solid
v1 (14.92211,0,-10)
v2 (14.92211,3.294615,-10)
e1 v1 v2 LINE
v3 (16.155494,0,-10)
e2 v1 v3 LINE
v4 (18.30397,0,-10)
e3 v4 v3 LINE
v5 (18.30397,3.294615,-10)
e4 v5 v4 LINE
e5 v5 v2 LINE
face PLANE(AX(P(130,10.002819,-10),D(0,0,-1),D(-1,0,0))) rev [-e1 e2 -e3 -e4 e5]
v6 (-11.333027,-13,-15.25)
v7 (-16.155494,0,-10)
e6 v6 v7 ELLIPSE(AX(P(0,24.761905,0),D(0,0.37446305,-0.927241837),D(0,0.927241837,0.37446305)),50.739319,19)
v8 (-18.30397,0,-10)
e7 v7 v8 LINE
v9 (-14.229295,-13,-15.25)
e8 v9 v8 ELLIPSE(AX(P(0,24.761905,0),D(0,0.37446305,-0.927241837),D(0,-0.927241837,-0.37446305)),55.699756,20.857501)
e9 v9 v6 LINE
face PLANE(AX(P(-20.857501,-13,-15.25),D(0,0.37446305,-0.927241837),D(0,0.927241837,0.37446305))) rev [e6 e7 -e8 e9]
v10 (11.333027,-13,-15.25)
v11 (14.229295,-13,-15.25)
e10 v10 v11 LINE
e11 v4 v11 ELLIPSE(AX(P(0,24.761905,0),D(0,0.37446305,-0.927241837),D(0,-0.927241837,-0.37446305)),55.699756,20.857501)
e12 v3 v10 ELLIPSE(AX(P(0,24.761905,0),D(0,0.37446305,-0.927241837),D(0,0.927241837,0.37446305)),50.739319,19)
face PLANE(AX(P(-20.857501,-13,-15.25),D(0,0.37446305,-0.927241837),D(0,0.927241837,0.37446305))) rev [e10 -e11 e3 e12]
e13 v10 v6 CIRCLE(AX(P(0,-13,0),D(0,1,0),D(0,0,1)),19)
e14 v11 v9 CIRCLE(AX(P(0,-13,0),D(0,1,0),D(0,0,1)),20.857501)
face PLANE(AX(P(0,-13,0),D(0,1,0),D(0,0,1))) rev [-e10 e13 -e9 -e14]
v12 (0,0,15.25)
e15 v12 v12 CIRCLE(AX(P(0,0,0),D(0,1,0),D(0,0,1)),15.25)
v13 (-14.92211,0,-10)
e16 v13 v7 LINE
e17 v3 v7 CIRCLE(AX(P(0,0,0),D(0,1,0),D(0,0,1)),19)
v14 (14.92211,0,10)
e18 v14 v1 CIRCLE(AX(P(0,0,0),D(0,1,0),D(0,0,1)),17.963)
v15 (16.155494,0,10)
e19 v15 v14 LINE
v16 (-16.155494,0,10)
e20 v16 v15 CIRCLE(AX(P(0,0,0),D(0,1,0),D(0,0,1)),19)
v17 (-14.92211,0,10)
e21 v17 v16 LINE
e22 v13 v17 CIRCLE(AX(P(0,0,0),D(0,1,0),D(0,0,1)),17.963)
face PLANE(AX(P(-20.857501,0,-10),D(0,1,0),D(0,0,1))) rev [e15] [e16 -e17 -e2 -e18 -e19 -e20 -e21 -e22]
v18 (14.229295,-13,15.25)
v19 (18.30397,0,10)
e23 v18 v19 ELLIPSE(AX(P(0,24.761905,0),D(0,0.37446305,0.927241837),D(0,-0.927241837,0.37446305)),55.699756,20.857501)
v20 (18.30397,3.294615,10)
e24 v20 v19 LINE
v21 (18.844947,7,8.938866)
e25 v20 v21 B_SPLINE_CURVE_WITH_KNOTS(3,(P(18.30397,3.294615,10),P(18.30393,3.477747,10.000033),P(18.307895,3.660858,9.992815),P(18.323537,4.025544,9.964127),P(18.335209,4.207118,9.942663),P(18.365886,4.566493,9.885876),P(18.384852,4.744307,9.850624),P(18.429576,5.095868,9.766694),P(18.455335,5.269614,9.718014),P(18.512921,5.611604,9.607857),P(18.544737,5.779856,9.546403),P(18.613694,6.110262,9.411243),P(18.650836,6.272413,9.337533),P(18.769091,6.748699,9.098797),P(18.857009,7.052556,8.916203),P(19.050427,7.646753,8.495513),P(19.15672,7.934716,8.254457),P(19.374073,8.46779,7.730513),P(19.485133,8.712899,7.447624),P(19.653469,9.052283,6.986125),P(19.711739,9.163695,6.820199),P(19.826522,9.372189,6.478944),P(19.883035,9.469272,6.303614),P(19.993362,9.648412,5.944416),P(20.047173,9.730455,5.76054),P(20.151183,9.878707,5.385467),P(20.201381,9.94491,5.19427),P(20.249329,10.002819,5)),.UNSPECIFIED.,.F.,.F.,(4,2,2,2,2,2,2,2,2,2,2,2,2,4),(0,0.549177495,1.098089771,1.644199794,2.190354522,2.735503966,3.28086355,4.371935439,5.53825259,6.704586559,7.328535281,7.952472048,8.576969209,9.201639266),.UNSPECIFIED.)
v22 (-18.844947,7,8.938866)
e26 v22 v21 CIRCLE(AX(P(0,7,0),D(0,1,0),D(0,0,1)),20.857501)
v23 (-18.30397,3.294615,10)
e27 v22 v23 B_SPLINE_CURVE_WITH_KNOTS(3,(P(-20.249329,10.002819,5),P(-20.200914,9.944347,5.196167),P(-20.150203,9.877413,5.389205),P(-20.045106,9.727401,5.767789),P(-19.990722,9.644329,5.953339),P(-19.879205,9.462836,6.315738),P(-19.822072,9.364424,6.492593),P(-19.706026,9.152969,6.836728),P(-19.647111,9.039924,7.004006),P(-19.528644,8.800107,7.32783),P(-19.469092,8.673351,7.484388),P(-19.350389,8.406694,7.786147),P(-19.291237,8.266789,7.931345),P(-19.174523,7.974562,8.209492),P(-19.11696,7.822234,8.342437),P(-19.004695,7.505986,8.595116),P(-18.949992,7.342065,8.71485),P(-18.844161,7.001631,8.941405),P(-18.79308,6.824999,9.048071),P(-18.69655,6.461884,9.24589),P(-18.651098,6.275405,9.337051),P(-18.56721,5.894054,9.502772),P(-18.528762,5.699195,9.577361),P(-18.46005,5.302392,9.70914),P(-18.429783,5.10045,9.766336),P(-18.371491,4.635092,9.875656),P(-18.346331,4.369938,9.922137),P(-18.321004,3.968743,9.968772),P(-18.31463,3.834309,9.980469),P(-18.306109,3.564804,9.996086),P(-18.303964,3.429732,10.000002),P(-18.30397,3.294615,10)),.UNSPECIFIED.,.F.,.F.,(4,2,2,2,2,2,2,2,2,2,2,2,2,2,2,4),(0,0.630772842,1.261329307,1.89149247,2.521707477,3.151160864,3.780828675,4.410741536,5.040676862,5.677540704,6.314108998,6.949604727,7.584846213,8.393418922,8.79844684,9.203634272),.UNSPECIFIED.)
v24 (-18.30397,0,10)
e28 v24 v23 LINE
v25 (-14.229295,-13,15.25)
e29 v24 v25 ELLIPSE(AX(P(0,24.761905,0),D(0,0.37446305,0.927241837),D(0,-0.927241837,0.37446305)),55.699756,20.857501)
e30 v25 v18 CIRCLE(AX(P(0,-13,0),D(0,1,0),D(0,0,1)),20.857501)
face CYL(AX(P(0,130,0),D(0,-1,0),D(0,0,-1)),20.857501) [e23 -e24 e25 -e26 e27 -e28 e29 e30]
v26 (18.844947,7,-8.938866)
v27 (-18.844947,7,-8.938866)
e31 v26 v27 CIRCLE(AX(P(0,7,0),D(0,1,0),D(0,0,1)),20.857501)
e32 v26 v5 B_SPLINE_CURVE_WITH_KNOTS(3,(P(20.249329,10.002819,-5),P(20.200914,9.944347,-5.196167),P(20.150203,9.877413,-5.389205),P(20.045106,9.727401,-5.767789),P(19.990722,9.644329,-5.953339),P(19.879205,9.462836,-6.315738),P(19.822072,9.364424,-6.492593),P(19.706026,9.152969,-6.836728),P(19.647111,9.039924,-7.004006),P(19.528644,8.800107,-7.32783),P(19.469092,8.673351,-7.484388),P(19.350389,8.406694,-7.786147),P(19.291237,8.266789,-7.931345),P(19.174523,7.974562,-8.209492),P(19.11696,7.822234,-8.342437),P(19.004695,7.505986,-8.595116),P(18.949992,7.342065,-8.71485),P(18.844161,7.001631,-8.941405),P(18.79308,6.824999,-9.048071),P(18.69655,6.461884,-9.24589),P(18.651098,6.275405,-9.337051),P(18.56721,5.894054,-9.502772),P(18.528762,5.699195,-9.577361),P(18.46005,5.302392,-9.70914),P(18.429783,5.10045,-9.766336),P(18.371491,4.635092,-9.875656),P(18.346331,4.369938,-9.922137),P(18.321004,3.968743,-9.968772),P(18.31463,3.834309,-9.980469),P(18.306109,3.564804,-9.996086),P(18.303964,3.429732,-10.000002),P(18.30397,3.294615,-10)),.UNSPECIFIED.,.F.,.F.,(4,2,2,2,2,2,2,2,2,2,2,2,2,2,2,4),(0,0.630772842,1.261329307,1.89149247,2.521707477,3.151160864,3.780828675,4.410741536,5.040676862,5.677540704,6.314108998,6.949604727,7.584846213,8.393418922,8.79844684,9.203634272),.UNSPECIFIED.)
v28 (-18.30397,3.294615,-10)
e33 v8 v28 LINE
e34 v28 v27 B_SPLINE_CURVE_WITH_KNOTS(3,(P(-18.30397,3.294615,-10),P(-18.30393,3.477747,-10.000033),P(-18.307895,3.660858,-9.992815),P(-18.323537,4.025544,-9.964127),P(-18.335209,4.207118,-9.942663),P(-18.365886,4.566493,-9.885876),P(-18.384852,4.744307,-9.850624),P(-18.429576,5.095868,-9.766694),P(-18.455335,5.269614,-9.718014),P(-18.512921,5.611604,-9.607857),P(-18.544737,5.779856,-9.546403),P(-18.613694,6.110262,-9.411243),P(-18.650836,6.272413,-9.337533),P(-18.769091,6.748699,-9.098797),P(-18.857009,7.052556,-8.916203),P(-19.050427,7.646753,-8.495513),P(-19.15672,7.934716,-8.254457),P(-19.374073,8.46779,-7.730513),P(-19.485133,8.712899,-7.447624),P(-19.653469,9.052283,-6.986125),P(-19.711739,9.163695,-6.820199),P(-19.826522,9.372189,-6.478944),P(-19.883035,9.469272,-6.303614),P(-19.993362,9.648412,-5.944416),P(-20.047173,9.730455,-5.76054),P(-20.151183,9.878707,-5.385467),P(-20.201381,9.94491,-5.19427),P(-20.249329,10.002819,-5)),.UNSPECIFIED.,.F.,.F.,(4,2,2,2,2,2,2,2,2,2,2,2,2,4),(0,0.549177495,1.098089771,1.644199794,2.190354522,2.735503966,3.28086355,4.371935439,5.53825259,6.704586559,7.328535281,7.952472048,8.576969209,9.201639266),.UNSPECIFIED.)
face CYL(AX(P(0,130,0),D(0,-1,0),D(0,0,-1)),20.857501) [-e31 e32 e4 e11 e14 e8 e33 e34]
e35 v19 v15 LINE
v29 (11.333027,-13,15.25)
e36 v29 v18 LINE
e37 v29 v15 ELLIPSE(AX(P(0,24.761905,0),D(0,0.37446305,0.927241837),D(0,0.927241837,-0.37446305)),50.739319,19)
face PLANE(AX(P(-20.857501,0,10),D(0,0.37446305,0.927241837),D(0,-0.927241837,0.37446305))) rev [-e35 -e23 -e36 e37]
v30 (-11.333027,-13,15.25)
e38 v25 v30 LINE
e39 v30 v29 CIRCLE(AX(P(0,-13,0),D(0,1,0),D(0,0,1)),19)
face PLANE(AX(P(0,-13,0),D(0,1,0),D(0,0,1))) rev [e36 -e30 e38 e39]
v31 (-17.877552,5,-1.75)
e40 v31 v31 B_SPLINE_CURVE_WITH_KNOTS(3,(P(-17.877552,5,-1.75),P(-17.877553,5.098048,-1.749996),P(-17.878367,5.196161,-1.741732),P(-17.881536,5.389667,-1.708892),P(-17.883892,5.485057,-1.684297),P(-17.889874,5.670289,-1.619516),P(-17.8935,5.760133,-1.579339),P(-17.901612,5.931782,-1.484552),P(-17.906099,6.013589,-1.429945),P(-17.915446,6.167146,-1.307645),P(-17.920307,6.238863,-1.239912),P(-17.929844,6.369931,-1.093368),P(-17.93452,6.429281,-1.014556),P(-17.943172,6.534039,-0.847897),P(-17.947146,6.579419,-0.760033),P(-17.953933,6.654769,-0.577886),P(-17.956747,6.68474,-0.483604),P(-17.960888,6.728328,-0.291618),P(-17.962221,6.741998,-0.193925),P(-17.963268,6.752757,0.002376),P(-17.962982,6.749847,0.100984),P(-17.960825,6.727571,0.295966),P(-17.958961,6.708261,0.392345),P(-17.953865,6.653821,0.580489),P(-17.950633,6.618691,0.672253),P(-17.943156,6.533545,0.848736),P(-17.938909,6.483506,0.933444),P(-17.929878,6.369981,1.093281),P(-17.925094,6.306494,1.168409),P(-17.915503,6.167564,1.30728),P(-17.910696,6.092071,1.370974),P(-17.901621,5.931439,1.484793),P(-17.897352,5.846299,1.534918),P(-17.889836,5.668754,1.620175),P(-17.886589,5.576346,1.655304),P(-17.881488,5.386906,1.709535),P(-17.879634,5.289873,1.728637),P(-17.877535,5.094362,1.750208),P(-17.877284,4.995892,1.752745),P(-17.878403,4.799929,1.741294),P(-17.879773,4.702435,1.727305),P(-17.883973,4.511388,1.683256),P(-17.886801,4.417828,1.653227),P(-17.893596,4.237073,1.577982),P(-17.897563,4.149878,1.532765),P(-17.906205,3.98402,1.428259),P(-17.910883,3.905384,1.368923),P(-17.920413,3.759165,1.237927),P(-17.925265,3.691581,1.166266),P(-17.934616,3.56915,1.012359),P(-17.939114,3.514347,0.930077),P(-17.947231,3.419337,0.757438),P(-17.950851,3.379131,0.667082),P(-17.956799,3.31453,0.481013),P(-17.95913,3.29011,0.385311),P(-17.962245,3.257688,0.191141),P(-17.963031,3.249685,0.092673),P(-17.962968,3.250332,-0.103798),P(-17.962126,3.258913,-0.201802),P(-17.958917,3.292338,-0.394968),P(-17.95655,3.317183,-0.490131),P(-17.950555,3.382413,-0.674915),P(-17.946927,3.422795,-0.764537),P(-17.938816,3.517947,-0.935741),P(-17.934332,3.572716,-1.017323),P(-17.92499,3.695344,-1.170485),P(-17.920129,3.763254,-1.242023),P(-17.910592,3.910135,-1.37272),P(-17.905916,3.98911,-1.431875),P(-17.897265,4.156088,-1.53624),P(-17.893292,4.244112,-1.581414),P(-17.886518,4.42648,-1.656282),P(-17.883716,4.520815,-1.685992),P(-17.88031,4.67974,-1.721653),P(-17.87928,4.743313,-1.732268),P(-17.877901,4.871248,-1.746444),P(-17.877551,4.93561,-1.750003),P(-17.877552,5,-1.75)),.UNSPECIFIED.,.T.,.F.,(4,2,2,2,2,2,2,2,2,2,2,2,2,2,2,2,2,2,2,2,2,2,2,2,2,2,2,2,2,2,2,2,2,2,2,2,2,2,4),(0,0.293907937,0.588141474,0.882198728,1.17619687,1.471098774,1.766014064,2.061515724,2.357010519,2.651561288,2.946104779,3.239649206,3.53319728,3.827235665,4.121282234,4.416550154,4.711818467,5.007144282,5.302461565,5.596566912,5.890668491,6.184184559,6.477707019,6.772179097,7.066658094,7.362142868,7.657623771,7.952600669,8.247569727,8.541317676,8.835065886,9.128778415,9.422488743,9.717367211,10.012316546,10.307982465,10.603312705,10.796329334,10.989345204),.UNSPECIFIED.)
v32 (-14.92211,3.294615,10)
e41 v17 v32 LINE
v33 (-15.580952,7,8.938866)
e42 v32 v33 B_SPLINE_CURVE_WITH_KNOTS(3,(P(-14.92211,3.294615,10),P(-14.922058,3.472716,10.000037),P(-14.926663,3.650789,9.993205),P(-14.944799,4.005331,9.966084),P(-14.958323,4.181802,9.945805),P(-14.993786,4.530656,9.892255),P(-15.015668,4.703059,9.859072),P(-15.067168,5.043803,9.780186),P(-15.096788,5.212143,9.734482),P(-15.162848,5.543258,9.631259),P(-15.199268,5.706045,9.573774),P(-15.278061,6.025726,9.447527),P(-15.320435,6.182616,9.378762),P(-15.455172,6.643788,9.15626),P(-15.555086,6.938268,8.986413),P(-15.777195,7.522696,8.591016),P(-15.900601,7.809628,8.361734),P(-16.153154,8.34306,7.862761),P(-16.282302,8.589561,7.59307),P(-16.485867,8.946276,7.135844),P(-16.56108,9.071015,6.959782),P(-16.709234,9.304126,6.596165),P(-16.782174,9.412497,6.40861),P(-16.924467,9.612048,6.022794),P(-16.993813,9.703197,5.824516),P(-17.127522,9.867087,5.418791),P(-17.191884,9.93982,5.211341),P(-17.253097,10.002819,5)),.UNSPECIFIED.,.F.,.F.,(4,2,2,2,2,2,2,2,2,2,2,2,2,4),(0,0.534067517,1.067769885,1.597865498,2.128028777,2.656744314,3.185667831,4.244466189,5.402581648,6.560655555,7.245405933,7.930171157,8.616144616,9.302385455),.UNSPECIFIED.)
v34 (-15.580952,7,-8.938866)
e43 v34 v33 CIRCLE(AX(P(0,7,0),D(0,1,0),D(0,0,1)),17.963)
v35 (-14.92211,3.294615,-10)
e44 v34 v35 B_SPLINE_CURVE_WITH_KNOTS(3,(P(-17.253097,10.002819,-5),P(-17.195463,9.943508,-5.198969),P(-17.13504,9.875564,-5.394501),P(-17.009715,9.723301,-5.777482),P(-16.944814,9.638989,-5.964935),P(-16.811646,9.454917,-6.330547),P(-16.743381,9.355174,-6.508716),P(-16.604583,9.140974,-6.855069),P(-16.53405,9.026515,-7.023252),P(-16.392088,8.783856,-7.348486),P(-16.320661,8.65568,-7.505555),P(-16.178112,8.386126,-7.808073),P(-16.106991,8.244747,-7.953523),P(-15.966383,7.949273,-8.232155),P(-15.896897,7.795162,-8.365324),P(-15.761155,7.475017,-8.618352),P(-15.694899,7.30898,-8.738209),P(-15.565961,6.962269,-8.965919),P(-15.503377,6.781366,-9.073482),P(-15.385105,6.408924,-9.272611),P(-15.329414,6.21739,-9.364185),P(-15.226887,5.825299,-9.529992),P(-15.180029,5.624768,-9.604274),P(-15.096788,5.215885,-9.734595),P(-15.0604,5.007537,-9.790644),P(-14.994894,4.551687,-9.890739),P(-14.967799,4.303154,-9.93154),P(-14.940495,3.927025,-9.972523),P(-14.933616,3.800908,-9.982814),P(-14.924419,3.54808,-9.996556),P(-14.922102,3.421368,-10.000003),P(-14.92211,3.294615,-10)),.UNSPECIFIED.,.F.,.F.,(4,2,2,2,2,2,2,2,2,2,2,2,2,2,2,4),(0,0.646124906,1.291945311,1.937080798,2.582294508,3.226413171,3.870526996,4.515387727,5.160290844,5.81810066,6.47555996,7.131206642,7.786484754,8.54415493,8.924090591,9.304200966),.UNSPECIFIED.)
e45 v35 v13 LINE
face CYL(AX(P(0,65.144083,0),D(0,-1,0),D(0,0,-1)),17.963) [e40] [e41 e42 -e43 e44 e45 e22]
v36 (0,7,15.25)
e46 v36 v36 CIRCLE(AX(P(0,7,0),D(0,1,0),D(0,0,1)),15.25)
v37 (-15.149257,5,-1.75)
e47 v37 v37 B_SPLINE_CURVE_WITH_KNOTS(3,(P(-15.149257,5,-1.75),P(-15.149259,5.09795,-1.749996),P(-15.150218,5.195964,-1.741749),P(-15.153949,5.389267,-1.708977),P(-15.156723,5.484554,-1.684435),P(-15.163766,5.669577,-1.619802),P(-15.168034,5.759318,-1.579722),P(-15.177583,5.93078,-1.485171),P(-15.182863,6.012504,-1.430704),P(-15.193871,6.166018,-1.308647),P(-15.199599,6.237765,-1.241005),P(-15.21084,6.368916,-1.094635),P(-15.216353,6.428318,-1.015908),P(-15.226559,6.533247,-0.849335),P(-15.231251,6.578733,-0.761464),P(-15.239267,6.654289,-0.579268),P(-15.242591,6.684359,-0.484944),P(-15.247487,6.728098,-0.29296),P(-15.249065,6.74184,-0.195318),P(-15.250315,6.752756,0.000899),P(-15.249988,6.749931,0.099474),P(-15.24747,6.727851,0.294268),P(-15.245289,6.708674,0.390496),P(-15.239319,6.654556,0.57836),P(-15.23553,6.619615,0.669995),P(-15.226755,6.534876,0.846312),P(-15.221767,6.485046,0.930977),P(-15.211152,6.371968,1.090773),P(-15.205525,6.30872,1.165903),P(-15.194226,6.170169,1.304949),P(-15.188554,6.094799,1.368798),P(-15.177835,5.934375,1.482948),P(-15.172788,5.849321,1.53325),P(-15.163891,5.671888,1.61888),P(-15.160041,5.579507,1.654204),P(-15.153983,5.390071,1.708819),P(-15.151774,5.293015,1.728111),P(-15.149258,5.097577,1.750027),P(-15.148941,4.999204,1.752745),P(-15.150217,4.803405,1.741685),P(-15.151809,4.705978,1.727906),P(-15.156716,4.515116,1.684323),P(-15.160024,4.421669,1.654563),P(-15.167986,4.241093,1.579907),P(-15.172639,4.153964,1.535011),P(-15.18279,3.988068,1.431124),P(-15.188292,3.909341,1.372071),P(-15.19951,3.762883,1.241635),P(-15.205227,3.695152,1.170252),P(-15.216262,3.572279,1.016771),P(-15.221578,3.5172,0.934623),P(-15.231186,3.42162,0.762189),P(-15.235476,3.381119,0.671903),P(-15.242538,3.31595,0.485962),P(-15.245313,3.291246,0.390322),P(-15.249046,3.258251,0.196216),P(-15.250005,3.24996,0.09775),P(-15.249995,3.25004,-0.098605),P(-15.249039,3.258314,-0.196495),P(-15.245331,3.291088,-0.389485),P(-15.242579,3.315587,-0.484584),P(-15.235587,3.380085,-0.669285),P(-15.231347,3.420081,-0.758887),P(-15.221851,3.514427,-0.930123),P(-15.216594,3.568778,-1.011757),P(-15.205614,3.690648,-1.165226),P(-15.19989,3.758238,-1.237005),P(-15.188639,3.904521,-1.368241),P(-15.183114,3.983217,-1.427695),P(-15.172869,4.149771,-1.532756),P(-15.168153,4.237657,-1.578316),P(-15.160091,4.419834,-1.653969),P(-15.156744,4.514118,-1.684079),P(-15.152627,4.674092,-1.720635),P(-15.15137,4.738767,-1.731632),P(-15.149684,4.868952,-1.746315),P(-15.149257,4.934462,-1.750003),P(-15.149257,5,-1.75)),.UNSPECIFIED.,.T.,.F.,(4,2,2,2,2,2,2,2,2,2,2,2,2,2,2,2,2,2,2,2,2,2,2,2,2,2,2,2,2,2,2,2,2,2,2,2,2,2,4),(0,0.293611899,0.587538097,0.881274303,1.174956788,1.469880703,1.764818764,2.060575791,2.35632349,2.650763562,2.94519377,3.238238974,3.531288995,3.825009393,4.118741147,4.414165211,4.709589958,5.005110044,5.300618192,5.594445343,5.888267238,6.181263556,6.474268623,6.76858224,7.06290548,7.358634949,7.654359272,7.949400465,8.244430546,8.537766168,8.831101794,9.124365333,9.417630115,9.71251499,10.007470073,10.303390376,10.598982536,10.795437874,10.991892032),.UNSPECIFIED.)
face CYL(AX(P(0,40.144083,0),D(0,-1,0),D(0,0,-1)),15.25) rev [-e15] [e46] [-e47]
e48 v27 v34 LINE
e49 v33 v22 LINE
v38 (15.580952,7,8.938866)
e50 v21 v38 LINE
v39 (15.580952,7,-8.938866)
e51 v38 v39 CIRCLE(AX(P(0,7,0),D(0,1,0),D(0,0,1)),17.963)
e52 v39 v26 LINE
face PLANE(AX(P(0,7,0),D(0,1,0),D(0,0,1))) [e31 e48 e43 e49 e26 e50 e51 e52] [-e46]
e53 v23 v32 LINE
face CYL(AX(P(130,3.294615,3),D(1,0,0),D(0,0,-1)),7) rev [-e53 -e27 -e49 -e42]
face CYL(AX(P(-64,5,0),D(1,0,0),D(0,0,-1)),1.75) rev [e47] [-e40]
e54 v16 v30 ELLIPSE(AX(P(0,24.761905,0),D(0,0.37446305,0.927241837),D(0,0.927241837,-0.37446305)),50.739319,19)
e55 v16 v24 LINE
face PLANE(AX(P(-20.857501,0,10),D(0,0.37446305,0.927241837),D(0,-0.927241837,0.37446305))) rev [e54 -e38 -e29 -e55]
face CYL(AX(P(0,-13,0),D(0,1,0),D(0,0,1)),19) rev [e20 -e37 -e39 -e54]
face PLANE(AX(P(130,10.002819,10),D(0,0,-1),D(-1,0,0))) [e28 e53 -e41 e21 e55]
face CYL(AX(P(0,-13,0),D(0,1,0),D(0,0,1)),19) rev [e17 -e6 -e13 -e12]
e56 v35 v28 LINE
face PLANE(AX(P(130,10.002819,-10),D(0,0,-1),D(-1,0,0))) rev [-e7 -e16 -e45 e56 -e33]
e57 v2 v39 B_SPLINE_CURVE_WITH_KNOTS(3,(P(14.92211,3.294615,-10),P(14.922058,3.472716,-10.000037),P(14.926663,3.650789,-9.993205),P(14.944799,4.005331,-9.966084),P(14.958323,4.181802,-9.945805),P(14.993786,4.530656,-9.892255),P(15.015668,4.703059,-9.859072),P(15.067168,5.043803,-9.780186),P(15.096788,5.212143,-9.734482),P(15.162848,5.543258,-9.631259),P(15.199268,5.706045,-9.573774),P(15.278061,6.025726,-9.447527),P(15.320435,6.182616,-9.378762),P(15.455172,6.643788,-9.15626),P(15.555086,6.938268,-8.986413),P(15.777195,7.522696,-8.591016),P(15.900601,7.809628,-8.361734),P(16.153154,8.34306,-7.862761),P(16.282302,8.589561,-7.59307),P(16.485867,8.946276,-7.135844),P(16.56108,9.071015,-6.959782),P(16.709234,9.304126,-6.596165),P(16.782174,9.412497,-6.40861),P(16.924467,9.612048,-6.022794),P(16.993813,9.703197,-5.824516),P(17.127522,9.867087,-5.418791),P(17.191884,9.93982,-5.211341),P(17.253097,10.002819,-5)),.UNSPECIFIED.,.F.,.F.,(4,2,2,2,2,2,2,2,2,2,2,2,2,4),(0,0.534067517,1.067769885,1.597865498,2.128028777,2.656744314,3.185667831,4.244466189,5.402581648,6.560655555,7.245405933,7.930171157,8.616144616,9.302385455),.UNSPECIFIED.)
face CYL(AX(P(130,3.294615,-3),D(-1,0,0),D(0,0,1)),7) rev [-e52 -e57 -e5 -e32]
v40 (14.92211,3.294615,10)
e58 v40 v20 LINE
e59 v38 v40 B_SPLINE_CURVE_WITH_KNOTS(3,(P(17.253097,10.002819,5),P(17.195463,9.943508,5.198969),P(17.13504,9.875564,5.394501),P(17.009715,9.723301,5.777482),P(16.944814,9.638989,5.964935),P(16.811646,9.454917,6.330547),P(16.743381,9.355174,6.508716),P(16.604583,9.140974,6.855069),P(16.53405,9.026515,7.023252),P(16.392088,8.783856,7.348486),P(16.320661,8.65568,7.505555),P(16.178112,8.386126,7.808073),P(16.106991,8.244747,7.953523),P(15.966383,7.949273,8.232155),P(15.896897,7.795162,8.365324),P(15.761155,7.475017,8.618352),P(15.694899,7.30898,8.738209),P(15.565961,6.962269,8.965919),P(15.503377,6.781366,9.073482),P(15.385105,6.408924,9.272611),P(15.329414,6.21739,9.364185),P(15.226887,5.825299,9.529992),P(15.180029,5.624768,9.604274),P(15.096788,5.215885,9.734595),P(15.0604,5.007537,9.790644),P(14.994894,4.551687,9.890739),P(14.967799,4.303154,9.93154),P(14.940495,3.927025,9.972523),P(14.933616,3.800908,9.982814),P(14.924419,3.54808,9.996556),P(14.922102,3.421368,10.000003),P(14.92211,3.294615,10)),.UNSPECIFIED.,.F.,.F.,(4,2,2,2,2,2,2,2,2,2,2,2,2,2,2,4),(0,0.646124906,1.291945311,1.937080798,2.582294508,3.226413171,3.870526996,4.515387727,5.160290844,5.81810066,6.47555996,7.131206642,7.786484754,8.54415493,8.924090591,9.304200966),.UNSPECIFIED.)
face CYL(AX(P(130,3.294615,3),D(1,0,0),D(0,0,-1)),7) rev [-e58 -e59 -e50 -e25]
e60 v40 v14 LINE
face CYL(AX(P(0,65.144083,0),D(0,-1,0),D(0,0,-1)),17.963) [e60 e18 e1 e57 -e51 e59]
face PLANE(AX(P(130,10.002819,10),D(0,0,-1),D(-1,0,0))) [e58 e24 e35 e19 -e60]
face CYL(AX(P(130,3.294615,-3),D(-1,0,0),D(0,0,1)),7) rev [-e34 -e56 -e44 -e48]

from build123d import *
from build123d.topology import SkipClean

# Parameters (mm, degrees)
ESQUISSE1_R                   = 17.963
ESQUISSE1_R_2                 = 15.25
BOSS_EXTRU_1_DEPTH            = 40.144083067
CHANFREIN1_SIZE               = 2
ESQUISSE7_R                   = 17.963
BOSS_EXTRU_4_DEPTH            = 25
ESQUISSE8_R                   = 15.25
ENL_V_MAT_EXTRU_3_DEPTH       = 48.506695773
BOSS_EXTRU_5_DEPTH            = 130
ENL_V_MAT_EXTRU_8_DEPTH       = 134.304428503
ENL_V_MAT_EXTRU_8_DEPTH_BACK  = 134.304428503
ENL_V_MAT_EXTRU_9_DEPTH       = 130
ENL_V_MAT_EXTRU_9_DEPTH_BACK  = 130
ESQUISSE21_R                  = 17.963
ESQUISSE21_R_2                = 15.25
BOSS_EXTRU_6_DEPTH            = 65.144083
ESQUISSE22_R                  = 1.75
ENL_V_MAT_EXTRU_10_DEPTH      = 64
ESQUISSE23_R                  = 1.75
ENL_V_MAT_EXTRU_11_DEPTH      = 64
R_P_TITION_LIN_AIRE2_COUNT    = 2
R_P_TITION_LIN_AIRE2_PITCH    = 16
CONG_2_R                      = 7
ESQUISSE11_R                  = 1.5
ESQUISSE24_R                  = 20.85750055
BOSS_EXTRU_10_DEPTH           = 13
ESQUISSE26_R                  = 15.25
ENL_V_MAT_EXTRU_12_DEPTH      = 134.304428631
ENL_V_MAT_EXTRU_13_DEPTH      = 134.304428631
ENL_V_MAT_EXTRU_13_DEPTH_BACK = 134.304428631
ESQUISSE29_R                  = 19
ENL_V_MAT_EXTRU_14_DEPTH      = 13
ESQUISSE31_R                  = 30.102182373
ENL_V_MAT_EXTRU_15_DEPTH      = 123


with BuildPart() as part:
    # Esquisse1 → Boss.-Extru.1 (new body)
    with BuildSketch(Plane(origin=(0, 0, 0), x_dir=(1, 0, 0), z_dir=(0, 1, 0))):
        with Locations(Location((0, 0, 0), (0, 0, 270))):
            Circle(ESQUISSE1_R)
        with Locations(Location((0, 0, 0), (0, 0, 270))):
            Circle(ESQUISSE1_R_2, mode=Mode.SUBTRACT)
    extrude(amount=BOSS_EXTRU_1_DEPTH)

    # Chanfrein1
    chanfrein1_edges = [part.edges().sort_by_distance(p)[0] for p in [
        (0, 0, -17.963),
    ]]
    chamfer(chanfrein1_edges, length=CHANFREIN1_SIZE)

    # Esquisse7 → Boss.-Extru.4 (add)
    with BuildSketch(Plane(origin=(0, 40.144083067, 0), x_dir=(1, 0, 0), z_dir=(0, 1, 0))):
        with Locations(Location((0, 0, 0), (0, 0, 270))):
            Circle(ESQUISSE7_R)
    extrude(amount=BOSS_EXTRU_4_DEPTH)

    # Esquisse8 → Enlèv. mat.-Extru.3 (cut, through all)
    with BuildSketch(Plane.XZ.offset(-40.144083067)):
        with Locations(Location((0, 0, 0), (0, 0, 270))):
            Circle(ESQUISSE8_R)
    extrude(amount=-ENL_V_MAT_EXTRU_3_DEPTH, mode=Mode.SUBTRACT)

    # Esquisse10 → Boss.-Extru.5 (add)
    with BuildSketch(Plane(origin=(0, 0, 0), x_dir=(1, 0, 0), z_dir=(0, 1, 0))):
        with BuildLine():
            Line((20.85750055, 0), (17.963, 0))
            ThreePointArc((17.963, 0), (0, -17.963), (-17.963, 0))
            Line((-17.963, 0), (-20.85750055, 0))
            ThreePointArc((-20.85750055, 0), (0, -20.85750055), (20.85750055, 0))
        make_face()
    boss_extru_5 = extrude(amount=BOSS_EXTRU_5_DEPTH)

    # Symétrie3: Boss.-Extru.5 across plane
    with SkipClean():  # the faces are left unmerged after this step: merging them gives an invalid solid
        add(boss_extru_5.mirror(Plane.XY))

    # Esquisse18 → Enlèv. mat.-Extru.8 (cut, two sides: drawn at the far end of the back side and taken through both)
    with SkipClean():  # the faces are left unmerged after this step: merging them gives an invalid solid
        with BuildSketch(Plane(origin=(0, 0, 0), x_dir=(0, 0, -1), z_dir=(1, 0, 0)).offset(-ENL_V_MAT_EXTRU_8_DEPTH_BACK)):
            Polygon((-10, 121.154286311), (-13.911254963, 130), (13.911254963, 130), (10, 121.154286311), (10, 61.262819373), (-10, 61.262819373), align=None)
        extrude(amount=ENL_V_MAT_EXTRU_8_DEPTH + ENL_V_MAT_EXTRU_8_DEPTH_BACK, mode=Mode.SUBTRACT)

    # Esquisse20 → Enlèv. mat.-Extru.9 (cut, two sides: drawn at the far end of the back side and taken through both)
    with BuildSketch(Plane(origin=(0, 0, 0), x_dir=(0, 0, -1), z_dir=(1, 0, 0)).offset(-ENL_V_MAT_EXTRU_9_DEPTH_BACK)):
        Polygon((-5, 61.262819373), (5, 61.262819373), (5, 10.002819373), (10, 10.002819373), (10, 0), (-10, 0), (-10, 10.002819373), (-5, 10.002819373), align=None)
    extrude(amount=ENL_V_MAT_EXTRU_9_DEPTH + ENL_V_MAT_EXTRU_9_DEPTH_BACK, mode=Mode.SUBTRACT)


with BuildPart() as enl_v_mat_extru_9_piece_1:
    # of the separate pieces the step leaves, piece 1, a body of its own (enl_v_mat_extru_9_pieces)
    add(part.part.solids().sort_by_distance((-18.303970313, 0, -10))[0])



with BuildPart() as enl_v_mat_extru_9_piece_2:
    # of the separate pieces the step leaves, piece 2, a body of its own (enl_v_mat_extru_9_pieces)
    add(part.part.solids().sort_by_distance((-15.540666477, 130, 13.911254963))[0])


with BuildPart() as enl_v_mat_extru_9_piece_1_1:
    with SkipClean():  # the faces are left unmerged after this step: merging them gives an invalid solid
        add(enl_v_mat_extru_9_piece_1.part)

        add(enl_v_mat_extru_9_piece_2.part)  # Boss.-Extru.6 merges Enlèv. mat.-Extru.9 piece 2
        # Esquisse21 → Boss.-Extru.6 (add)
        with BuildSketch(Plane(origin=(0, 0, 0), x_dir=(1, 0, 0), z_dir=(0, 1, 0))):
            Circle(ESQUISSE21_R)
            with Locations(Location((0, 0, 0), (0, 0, 90))):
                Circle(ESQUISSE21_R_2, mode=Mode.SUBTRACT)
        extrude(amount=BOSS_EXTRU_6_DEPTH)

    # Esquisse22 → Enlèv. mat.-Extru.10 (cut)
    with SkipClean():  # the faces are left unmerged after this step: merging them gives an invalid solid
        with BuildSketch(Plane(origin=(0, 0, 0), x_dir=(0, 0, -1), z_dir=(1, 0, 0))):
            with Locations((0, 5)):
                Circle(ESQUISSE22_R)
        enl_v_mat_extru_10 = extrude(amount=-ENL_V_MAT_EXTRU_10_DEPTH, mode=Mode.SUBTRACT)

    # Esquisse23 → Enlèv. mat.-Extru.11 (cut)
    with SkipClean():  # the faces are left unmerged after this step: merging them gives an invalid solid
        with BuildSketch(Plane(origin=(0, 0, 0), x_dir=(0, 0, -1), z_dir=(1, 0, 0))):
            with Locations(Location((0, 13.3, 0), (0, 0, 180))):
                Circle(ESQUISSE23_R)
        extrude(amount=ENL_V_MAT_EXTRU_11_DEPTH, mode=Mode.SUBTRACT)

    # Répétition linéaire2: Enlèv. mat.-Extru.10 ×2
    with SkipClean():  # the faces are left unmerged after this step: merging them gives an invalid solid
        with Locations(*[(0, i * R_P_TITION_LIN_AIRE2_PITCH, 0) for i in range(1, R_P_TITION_LIN_AIRE2_COUNT)]):
            add(enl_v_mat_extru_10, mode=Mode.SUBTRACT)

    # Congé2
    # the kernel refuses this fillet: 7 mm, written as the material it adds along each edge
    with BuildSketch(Plane(origin=(-35.074480144, 61.262819373, 10), x_dir=(0, 1, 0), z_dir=(1, 0, 0))) as cong_2_piece_1_section:
        with BuildLine():
            CenterArc((6.708203932, -7), CONG_2_R, 90, 73.398450401)
            Line((0, -5), (-0.134164079, -4.96))
            ThreePointArc((-0.134164079, -4.96), (-0.14, -2.5), (-0.14, 0))
            Line((-0.14, 0), (0, 0.14))
            Line((0, 0.14), (6.708203932, 0.14))
            Line((6.708203932, 0.14), (6.708203932, 0))
        make_face()
    cong_2_piece_1 = extrude(amount=36.922879903, mode=Mode.PRIVATE)
    cong_2_piece_1 = cong_2_piece_1 & Plane(origin=(0, 62.883538638, 0), x_dir=(-1, 0, 0), z_dir=(0, -1, 0)) * Cylinder(20.85750055, 101, mode=Mode.PRIVATE)
    cong_2_piece_1 = cong_2_piece_1 - Plane(origin=(0, 62.883538638, 0), x_dir=(1, 0, 0), z_dir=(0, -1, 0)) * Cylinder(17.963, 101, mode=Mode.PRIVATE)
    add(cong_2_piece_1)
    with BuildSketch(Plane(origin=(-1.848399759, 61.262819373, 10), x_dir=(0, 0, -1), z_dir=(1, 0, 0))) as cong_2_piece_2_section:
        with BuildLine():
            CenterArc((7, 6.708203932), CONG_2_R, 180, 73.398450401)
            Line((0, 6.708203932), (-0.14, 6.708203932))
            Line((-0.14, 6.708203932), (-0.14, 0))
            Line((-0.14, 0), (0, -0.14))
            ThreePointArc((0, -0.14), (2.5, -0.14), (4.96, -0.134164079))
            Line((4.96, -0.134164079), (5, 0))
        make_face()
    cong_2_piece_2 = extrude(amount=36.922879903, mode=Mode.PRIVATE)
    cong_2_piece_2 = cong_2_piece_2 & Plane(origin=(0, 62.883538658, 0), x_dir=(-1, 0, 0), z_dir=(0, -1, 0)) * Cylinder(20.85750055, 101, mode=Mode.PRIVATE)
    cong_2_piece_2 = cong_2_piece_2 - Plane(origin=(0, 62.883538658, 0), x_dir=(1, 0, 0), z_dir=(0, -1, 0)) * Cylinder(17.963, 101, mode=Mode.PRIVATE)
    add(cong_2_piece_2)
    with BuildSketch(Plane(origin=(-1.848399759, 61.262819373, -10), x_dir=(0, 0, 1), z_dir=(1, 0, 0))) as cong_2_piece_3_section:
        with BuildLine():
            CenterArc((7, -6.708203932), CONG_2_R, 106.601549599, 73.398450401)
            Line((0, -6.708203932), (-0.14, -6.708203932))
            Line((-0.14, -6.708203932), (-0.14, 0))
            Line((-0.14, 0), (0, 0.14))
            ThreePointArc((0, 0.14), (2.5, 0.14), (4.96, 0.134164079))
            Line((4.96, 0.134164079), (5, 0))
        make_face()
    cong_2_piece_3 = extrude(amount=36.922879903, mode=Mode.PRIVATE)
    cong_2_piece_3 = cong_2_piece_3 & Plane(origin=(0, 62.883538748, 0), x_dir=(-1, 0, 0), z_dir=(0, -1, 0)) * Cylinder(20.85750055, 101, mode=Mode.PRIVATE)
    cong_2_piece_3 = cong_2_piece_3 - Plane(origin=(0, 62.883538748, 0), x_dir=(1, 0, 0), z_dir=(0, -1, 0)) * Cylinder(17.963, 101, mode=Mode.PRIVATE)
    add(cong_2_piece_3)
    with BuildSketch(Plane(origin=(-35.074480144, 61.262819373, -10), x_dir=(0, 0, 1), z_dir=(1, 0, 0))) as cong_2_piece_4_section:
        with BuildLine():
            CenterArc((7, -6.708203932), CONG_2_R, 106.601549599, 73.398450401)
            Line((0, -6.708203932), (-0.14, -6.708203932))
            Line((-0.14, -6.708203932), (-0.14, 0))
            Line((-0.14, 0), (0, 0.14))
            ThreePointArc((0, 0.14), (2.5, 0.14), (4.96, 0.134164079))
            Line((4.96, 0.134164079), (5, 0))
        make_face()
    cong_2_piece_4 = extrude(amount=36.922879903, mode=Mode.PRIVATE)
    cong_2_piece_4 = cong_2_piece_4 & Plane(origin=(0, 62.883538616, 0), x_dir=(-1, 0, 0), z_dir=(0, -1, 0)) * Cylinder(20.85750055, 101, mode=Mode.PRIVATE)
    cong_2_piece_4 = cong_2_piece_4 - Plane(origin=(0, 62.883538616, 0), x_dir=(1, 0, 0), z_dir=(0, -1, 0)) * Cylinder(17.963, 101, mode=Mode.PRIVATE)
    add(cong_2_piece_4)
    with BuildSketch(Plane(origin=(1.848399759, 10.002819373, -10), x_dir=(0, -1, 0), z_dir=(-1, 0, 0))) as cong_2_piece_5_section:
        with BuildLine():
            CenterArc((6.708203932, 7), CONG_2_R, 196.601549599, 73.398450401)
            Line((0, 5), (-0.134164079, 4.96))
            ThreePointArc((-0.134164079, 4.96), (-0.14, 2.5), (-0.14, 0))
            Line((-0.14, 0), (0, -0.14))
            Line((0, -0.14), (6.708203932, -0.14))
            Line((6.708203932, -0.14), (6.708203932, 0))
        make_face()
    cong_2_piece_5 = extrude(amount=36.922879903, mode=Mode.PRIVATE)
    cong_2_piece_5 = cong_2_piece_5 - Plane(origin=(0, 8.382100154, 0), x_dir=(1, 0, 0), z_dir=(0, -1, 0)) * Cylinder(17.963, 101, mode=Mode.PRIVATE)
    cong_2_piece_5 = cong_2_piece_5 & Plane(origin=(0, 8.382100154, 0), x_dir=(-1, 0, 0), z_dir=(0, -1, 0)) * Cylinder(20.85750055, 101, mode=Mode.PRIVATE)
    add(cong_2_piece_5)
    with BuildSketch(Plane(origin=(35.074480144, 10.002819373, -10), x_dir=(0, -1, 0), z_dir=(-1, 0, 0))) as cong_2_piece_6_section:
        with BuildLine():
            CenterArc((6.708203932, 7), CONG_2_R, 196.601549599, 73.398450401)
            Line((0, 5), (-0.134164079, 4.96))
            ThreePointArc((-0.134164079, 4.96), (-0.14, 2.5), (-0.14, 0))
            Line((-0.14, 0), (0, -0.14))
            Line((0, -0.14), (6.708203932, -0.14))
            Line((6.708203932, -0.14), (6.708203932, 0))
        make_face()
    cong_2_piece_6 = extrude(amount=36.922879903, mode=Mode.PRIVATE)
    cong_2_piece_6 = cong_2_piece_6 - Plane(origin=(0, 8.38209993, 0), x_dir=(1, 0, 0), z_dir=(0, -1, 0)) * Cylinder(17.963, 101, mode=Mode.PRIVATE)
    cong_2_piece_6 = cong_2_piece_6 & Plane(origin=(0, 8.38209993, 0), x_dir=(-1, 0, 0), z_dir=(0, -1, 0)) * Cylinder(20.85750055, 101, mode=Mode.PRIVATE)
    add(cong_2_piece_6)
    with BuildSketch(Plane(origin=(-1.848399759, 10.002819373, 10), x_dir=(0, -1, 0), z_dir=(1, 0, 0))) as cong_2_piece_7_section:
        with BuildLine():
            CenterArc((6.708203932, 7), CONG_2_R, 196.601549599, 73.398450401)
            Line((0, 5), (-0.134164079, 4.96))
            ThreePointArc((-0.134164079, 4.96), (-0.14, 2.5), (-0.14, 0))
            Line((-0.14, 0), (0, -0.14))
            Line((0, -0.14), (6.708203932, -0.14))
            Line((6.708203932, -0.14), (6.708203932, 0))
        make_face()
    cong_2_piece_7 = extrude(amount=36.922879903, mode=Mode.PRIVATE)
    cong_2_piece_7 = cong_2_piece_7 & Plane(origin=(0, 8.382100073, 0), x_dir=(-1, 0, 0), z_dir=(0, -1, 0)) * Cylinder(20.85750055, 101, mode=Mode.PRIVATE)
    cong_2_piece_7 = cong_2_piece_7 - Plane(origin=(0, 8.382100073, 0), x_dir=(1, 0, 0), z_dir=(0, -1, 0)) * Cylinder(17.963, 101, mode=Mode.PRIVATE)
    add(cong_2_piece_7)
    with BuildSketch(Plane(origin=(-35.074480144, 10.002819373, 10), x_dir=(0, 0, -1), z_dir=(1, 0, 0))) as cong_2_piece_8_section:
        with BuildLine():
            CenterArc((7, -6.708203932), CONG_2_R, 106.601549599, 73.398450401)
            Line((0, -6.708203932), (-0.14, -6.708203932))
            Line((-0.14, -6.708203932), (-0.14, 0))
            Line((-0.14, 0), (0, 0.14))
            ThreePointArc((0, 0.14), (2.5, 0.14), (4.96, 0.134164079))
            Line((4.96, 0.134164079), (5, 0))
        make_face()
    cong_2_piece_8 = extrude(amount=36.922879903, mode=Mode.PRIVATE)
    cong_2_piece_8 = cong_2_piece_8 & Plane(origin=(0, 8.382100055, 0), x_dir=(-1, 0, 0), z_dir=(0, -1, 0)) * Cylinder(20.85750055, 101, mode=Mode.PRIVATE)
    cong_2_piece_8 = cong_2_piece_8 - Plane(origin=(0, 8.382100055, 0), x_dir=(1, 0, 0), z_dir=(0, -1, 0)) * Cylinder(17.963, 101, mode=Mode.PRIVATE)
    add(cong_2_piece_8)

    # Balayage3: sweep along a curve in space
    with BuildLine() as balayage3_path:
        ThreePointArc((0, 65.144083067, -15.25), (10.783378413, 65.144083067, -10.783378413), (15.25, 65.144083067, 0))
        ThreePointArc((15.25, 65.144083067, 0), (10.783378413, 65.144083067, 10.783378413), (0, 65.144083067, 15.25))
        ThreePointArc((0, 65.144083067, 15.25), (-10.783378413, 65.144083067, 10.783378413), (-15.25, 65.144083067, 0))
        ThreePointArc((-15.25, 65.144083067, 0), (-10.783378413, 65.144083067, -10.783378413), (0, 65.144083067, -15.25))
    # Esquisse11 → Balayage3 (sweep)
    with BuildSketch(Plane(origin=(0, 0, 0), x_dir=(0, 0, -1), z_dir=(1, 0, 0))):
        with Locations((17.963, 65.144083067)):
            Circle(ESQUISSE11_R)
    sweep(path=balayage3_path.line)

    # Esquisse24 → Boss.-Extru.10 (add)
    with BuildSketch(Plane(origin=(0, 0, 0), x_dir=(1, 0, 0), z_dir=(0, 1, 0))):
        with Locations(Location((0, 0, 0), (0, 0, 41.83337037))):
            Circle(ESQUISSE24_R)
    extrude(amount=-BOSS_EXTRU_10_DEPTH)

    # Esquisse26 → Enlèv. mat.-Extru.12 (cut, through all)
    with SkipClean():  # the faces are left unmerged after this step: merging them gives an invalid solid
        with BuildSketch(Plane(origin=(0, 0, 0), x_dir=(1, 0, 0), z_dir=(0, 1, 0))):
            with Locations(Location((0, 0, 0), (0, 0, 90))):
                Circle(ESQUISSE26_R)
        extrude(amount=-ENL_V_MAT_EXTRU_12_DEPTH, mode=Mode.SUBTRACT)
    add(enl_v_mat_extru_9_piece_1_1.part.scale(1), mode=Mode.REPLACE)  # the faces are merged on a copy

    # Esquisse27 → Enlèv. mat.-Extru.13 (cut, two sides: drawn at the far end of the back side and taken through both)
    with SkipClean():  # the faces are left unmerged after this step: merging them gives an invalid solid
        with BuildSketch(Plane(origin=(0, 0, 0), x_dir=(0, 0, -1), z_dir=(1, 0, 0)).offset(-ENL_V_MAT_EXTRU_13_DEPTH_BACK)):
            Polygon((-10, 0), (-15.25, -13), (15.25, -13), (10, 0), align=None)
        extrude(amount=ENL_V_MAT_EXTRU_13_DEPTH + ENL_V_MAT_EXTRU_13_DEPTH_BACK, mode=Mode.SUBTRACT)

    # Esquisse29 → Enlèv. mat.-Extru.14 (cut)
    with BuildSketch(Plane(origin=(0, 0, 0), x_dir=(1, 0, 0), z_dir=(0, 1, 0))):
        Circle(ESQUISSE29_R)
    extrude(amount=-ENL_V_MAT_EXTRU_14_DEPTH, mode=Mode.SUBTRACT)

    # Esquisse31 → Enlèv. mat.-Extru.15 (cut)
    with BuildSketch(Plane(origin=(0, 130, 0), x_dir=(1, 0, 0), z_dir=(0, 1, 0))):
        Circle(ESQUISSE31_R)
    extrude(amount=-ENL_V_MAT_EXTRU_15_DEPTH, mode=Mode.SUBTRACT)


solid = enl_v_mat_extru_9_piece_1_1.part
